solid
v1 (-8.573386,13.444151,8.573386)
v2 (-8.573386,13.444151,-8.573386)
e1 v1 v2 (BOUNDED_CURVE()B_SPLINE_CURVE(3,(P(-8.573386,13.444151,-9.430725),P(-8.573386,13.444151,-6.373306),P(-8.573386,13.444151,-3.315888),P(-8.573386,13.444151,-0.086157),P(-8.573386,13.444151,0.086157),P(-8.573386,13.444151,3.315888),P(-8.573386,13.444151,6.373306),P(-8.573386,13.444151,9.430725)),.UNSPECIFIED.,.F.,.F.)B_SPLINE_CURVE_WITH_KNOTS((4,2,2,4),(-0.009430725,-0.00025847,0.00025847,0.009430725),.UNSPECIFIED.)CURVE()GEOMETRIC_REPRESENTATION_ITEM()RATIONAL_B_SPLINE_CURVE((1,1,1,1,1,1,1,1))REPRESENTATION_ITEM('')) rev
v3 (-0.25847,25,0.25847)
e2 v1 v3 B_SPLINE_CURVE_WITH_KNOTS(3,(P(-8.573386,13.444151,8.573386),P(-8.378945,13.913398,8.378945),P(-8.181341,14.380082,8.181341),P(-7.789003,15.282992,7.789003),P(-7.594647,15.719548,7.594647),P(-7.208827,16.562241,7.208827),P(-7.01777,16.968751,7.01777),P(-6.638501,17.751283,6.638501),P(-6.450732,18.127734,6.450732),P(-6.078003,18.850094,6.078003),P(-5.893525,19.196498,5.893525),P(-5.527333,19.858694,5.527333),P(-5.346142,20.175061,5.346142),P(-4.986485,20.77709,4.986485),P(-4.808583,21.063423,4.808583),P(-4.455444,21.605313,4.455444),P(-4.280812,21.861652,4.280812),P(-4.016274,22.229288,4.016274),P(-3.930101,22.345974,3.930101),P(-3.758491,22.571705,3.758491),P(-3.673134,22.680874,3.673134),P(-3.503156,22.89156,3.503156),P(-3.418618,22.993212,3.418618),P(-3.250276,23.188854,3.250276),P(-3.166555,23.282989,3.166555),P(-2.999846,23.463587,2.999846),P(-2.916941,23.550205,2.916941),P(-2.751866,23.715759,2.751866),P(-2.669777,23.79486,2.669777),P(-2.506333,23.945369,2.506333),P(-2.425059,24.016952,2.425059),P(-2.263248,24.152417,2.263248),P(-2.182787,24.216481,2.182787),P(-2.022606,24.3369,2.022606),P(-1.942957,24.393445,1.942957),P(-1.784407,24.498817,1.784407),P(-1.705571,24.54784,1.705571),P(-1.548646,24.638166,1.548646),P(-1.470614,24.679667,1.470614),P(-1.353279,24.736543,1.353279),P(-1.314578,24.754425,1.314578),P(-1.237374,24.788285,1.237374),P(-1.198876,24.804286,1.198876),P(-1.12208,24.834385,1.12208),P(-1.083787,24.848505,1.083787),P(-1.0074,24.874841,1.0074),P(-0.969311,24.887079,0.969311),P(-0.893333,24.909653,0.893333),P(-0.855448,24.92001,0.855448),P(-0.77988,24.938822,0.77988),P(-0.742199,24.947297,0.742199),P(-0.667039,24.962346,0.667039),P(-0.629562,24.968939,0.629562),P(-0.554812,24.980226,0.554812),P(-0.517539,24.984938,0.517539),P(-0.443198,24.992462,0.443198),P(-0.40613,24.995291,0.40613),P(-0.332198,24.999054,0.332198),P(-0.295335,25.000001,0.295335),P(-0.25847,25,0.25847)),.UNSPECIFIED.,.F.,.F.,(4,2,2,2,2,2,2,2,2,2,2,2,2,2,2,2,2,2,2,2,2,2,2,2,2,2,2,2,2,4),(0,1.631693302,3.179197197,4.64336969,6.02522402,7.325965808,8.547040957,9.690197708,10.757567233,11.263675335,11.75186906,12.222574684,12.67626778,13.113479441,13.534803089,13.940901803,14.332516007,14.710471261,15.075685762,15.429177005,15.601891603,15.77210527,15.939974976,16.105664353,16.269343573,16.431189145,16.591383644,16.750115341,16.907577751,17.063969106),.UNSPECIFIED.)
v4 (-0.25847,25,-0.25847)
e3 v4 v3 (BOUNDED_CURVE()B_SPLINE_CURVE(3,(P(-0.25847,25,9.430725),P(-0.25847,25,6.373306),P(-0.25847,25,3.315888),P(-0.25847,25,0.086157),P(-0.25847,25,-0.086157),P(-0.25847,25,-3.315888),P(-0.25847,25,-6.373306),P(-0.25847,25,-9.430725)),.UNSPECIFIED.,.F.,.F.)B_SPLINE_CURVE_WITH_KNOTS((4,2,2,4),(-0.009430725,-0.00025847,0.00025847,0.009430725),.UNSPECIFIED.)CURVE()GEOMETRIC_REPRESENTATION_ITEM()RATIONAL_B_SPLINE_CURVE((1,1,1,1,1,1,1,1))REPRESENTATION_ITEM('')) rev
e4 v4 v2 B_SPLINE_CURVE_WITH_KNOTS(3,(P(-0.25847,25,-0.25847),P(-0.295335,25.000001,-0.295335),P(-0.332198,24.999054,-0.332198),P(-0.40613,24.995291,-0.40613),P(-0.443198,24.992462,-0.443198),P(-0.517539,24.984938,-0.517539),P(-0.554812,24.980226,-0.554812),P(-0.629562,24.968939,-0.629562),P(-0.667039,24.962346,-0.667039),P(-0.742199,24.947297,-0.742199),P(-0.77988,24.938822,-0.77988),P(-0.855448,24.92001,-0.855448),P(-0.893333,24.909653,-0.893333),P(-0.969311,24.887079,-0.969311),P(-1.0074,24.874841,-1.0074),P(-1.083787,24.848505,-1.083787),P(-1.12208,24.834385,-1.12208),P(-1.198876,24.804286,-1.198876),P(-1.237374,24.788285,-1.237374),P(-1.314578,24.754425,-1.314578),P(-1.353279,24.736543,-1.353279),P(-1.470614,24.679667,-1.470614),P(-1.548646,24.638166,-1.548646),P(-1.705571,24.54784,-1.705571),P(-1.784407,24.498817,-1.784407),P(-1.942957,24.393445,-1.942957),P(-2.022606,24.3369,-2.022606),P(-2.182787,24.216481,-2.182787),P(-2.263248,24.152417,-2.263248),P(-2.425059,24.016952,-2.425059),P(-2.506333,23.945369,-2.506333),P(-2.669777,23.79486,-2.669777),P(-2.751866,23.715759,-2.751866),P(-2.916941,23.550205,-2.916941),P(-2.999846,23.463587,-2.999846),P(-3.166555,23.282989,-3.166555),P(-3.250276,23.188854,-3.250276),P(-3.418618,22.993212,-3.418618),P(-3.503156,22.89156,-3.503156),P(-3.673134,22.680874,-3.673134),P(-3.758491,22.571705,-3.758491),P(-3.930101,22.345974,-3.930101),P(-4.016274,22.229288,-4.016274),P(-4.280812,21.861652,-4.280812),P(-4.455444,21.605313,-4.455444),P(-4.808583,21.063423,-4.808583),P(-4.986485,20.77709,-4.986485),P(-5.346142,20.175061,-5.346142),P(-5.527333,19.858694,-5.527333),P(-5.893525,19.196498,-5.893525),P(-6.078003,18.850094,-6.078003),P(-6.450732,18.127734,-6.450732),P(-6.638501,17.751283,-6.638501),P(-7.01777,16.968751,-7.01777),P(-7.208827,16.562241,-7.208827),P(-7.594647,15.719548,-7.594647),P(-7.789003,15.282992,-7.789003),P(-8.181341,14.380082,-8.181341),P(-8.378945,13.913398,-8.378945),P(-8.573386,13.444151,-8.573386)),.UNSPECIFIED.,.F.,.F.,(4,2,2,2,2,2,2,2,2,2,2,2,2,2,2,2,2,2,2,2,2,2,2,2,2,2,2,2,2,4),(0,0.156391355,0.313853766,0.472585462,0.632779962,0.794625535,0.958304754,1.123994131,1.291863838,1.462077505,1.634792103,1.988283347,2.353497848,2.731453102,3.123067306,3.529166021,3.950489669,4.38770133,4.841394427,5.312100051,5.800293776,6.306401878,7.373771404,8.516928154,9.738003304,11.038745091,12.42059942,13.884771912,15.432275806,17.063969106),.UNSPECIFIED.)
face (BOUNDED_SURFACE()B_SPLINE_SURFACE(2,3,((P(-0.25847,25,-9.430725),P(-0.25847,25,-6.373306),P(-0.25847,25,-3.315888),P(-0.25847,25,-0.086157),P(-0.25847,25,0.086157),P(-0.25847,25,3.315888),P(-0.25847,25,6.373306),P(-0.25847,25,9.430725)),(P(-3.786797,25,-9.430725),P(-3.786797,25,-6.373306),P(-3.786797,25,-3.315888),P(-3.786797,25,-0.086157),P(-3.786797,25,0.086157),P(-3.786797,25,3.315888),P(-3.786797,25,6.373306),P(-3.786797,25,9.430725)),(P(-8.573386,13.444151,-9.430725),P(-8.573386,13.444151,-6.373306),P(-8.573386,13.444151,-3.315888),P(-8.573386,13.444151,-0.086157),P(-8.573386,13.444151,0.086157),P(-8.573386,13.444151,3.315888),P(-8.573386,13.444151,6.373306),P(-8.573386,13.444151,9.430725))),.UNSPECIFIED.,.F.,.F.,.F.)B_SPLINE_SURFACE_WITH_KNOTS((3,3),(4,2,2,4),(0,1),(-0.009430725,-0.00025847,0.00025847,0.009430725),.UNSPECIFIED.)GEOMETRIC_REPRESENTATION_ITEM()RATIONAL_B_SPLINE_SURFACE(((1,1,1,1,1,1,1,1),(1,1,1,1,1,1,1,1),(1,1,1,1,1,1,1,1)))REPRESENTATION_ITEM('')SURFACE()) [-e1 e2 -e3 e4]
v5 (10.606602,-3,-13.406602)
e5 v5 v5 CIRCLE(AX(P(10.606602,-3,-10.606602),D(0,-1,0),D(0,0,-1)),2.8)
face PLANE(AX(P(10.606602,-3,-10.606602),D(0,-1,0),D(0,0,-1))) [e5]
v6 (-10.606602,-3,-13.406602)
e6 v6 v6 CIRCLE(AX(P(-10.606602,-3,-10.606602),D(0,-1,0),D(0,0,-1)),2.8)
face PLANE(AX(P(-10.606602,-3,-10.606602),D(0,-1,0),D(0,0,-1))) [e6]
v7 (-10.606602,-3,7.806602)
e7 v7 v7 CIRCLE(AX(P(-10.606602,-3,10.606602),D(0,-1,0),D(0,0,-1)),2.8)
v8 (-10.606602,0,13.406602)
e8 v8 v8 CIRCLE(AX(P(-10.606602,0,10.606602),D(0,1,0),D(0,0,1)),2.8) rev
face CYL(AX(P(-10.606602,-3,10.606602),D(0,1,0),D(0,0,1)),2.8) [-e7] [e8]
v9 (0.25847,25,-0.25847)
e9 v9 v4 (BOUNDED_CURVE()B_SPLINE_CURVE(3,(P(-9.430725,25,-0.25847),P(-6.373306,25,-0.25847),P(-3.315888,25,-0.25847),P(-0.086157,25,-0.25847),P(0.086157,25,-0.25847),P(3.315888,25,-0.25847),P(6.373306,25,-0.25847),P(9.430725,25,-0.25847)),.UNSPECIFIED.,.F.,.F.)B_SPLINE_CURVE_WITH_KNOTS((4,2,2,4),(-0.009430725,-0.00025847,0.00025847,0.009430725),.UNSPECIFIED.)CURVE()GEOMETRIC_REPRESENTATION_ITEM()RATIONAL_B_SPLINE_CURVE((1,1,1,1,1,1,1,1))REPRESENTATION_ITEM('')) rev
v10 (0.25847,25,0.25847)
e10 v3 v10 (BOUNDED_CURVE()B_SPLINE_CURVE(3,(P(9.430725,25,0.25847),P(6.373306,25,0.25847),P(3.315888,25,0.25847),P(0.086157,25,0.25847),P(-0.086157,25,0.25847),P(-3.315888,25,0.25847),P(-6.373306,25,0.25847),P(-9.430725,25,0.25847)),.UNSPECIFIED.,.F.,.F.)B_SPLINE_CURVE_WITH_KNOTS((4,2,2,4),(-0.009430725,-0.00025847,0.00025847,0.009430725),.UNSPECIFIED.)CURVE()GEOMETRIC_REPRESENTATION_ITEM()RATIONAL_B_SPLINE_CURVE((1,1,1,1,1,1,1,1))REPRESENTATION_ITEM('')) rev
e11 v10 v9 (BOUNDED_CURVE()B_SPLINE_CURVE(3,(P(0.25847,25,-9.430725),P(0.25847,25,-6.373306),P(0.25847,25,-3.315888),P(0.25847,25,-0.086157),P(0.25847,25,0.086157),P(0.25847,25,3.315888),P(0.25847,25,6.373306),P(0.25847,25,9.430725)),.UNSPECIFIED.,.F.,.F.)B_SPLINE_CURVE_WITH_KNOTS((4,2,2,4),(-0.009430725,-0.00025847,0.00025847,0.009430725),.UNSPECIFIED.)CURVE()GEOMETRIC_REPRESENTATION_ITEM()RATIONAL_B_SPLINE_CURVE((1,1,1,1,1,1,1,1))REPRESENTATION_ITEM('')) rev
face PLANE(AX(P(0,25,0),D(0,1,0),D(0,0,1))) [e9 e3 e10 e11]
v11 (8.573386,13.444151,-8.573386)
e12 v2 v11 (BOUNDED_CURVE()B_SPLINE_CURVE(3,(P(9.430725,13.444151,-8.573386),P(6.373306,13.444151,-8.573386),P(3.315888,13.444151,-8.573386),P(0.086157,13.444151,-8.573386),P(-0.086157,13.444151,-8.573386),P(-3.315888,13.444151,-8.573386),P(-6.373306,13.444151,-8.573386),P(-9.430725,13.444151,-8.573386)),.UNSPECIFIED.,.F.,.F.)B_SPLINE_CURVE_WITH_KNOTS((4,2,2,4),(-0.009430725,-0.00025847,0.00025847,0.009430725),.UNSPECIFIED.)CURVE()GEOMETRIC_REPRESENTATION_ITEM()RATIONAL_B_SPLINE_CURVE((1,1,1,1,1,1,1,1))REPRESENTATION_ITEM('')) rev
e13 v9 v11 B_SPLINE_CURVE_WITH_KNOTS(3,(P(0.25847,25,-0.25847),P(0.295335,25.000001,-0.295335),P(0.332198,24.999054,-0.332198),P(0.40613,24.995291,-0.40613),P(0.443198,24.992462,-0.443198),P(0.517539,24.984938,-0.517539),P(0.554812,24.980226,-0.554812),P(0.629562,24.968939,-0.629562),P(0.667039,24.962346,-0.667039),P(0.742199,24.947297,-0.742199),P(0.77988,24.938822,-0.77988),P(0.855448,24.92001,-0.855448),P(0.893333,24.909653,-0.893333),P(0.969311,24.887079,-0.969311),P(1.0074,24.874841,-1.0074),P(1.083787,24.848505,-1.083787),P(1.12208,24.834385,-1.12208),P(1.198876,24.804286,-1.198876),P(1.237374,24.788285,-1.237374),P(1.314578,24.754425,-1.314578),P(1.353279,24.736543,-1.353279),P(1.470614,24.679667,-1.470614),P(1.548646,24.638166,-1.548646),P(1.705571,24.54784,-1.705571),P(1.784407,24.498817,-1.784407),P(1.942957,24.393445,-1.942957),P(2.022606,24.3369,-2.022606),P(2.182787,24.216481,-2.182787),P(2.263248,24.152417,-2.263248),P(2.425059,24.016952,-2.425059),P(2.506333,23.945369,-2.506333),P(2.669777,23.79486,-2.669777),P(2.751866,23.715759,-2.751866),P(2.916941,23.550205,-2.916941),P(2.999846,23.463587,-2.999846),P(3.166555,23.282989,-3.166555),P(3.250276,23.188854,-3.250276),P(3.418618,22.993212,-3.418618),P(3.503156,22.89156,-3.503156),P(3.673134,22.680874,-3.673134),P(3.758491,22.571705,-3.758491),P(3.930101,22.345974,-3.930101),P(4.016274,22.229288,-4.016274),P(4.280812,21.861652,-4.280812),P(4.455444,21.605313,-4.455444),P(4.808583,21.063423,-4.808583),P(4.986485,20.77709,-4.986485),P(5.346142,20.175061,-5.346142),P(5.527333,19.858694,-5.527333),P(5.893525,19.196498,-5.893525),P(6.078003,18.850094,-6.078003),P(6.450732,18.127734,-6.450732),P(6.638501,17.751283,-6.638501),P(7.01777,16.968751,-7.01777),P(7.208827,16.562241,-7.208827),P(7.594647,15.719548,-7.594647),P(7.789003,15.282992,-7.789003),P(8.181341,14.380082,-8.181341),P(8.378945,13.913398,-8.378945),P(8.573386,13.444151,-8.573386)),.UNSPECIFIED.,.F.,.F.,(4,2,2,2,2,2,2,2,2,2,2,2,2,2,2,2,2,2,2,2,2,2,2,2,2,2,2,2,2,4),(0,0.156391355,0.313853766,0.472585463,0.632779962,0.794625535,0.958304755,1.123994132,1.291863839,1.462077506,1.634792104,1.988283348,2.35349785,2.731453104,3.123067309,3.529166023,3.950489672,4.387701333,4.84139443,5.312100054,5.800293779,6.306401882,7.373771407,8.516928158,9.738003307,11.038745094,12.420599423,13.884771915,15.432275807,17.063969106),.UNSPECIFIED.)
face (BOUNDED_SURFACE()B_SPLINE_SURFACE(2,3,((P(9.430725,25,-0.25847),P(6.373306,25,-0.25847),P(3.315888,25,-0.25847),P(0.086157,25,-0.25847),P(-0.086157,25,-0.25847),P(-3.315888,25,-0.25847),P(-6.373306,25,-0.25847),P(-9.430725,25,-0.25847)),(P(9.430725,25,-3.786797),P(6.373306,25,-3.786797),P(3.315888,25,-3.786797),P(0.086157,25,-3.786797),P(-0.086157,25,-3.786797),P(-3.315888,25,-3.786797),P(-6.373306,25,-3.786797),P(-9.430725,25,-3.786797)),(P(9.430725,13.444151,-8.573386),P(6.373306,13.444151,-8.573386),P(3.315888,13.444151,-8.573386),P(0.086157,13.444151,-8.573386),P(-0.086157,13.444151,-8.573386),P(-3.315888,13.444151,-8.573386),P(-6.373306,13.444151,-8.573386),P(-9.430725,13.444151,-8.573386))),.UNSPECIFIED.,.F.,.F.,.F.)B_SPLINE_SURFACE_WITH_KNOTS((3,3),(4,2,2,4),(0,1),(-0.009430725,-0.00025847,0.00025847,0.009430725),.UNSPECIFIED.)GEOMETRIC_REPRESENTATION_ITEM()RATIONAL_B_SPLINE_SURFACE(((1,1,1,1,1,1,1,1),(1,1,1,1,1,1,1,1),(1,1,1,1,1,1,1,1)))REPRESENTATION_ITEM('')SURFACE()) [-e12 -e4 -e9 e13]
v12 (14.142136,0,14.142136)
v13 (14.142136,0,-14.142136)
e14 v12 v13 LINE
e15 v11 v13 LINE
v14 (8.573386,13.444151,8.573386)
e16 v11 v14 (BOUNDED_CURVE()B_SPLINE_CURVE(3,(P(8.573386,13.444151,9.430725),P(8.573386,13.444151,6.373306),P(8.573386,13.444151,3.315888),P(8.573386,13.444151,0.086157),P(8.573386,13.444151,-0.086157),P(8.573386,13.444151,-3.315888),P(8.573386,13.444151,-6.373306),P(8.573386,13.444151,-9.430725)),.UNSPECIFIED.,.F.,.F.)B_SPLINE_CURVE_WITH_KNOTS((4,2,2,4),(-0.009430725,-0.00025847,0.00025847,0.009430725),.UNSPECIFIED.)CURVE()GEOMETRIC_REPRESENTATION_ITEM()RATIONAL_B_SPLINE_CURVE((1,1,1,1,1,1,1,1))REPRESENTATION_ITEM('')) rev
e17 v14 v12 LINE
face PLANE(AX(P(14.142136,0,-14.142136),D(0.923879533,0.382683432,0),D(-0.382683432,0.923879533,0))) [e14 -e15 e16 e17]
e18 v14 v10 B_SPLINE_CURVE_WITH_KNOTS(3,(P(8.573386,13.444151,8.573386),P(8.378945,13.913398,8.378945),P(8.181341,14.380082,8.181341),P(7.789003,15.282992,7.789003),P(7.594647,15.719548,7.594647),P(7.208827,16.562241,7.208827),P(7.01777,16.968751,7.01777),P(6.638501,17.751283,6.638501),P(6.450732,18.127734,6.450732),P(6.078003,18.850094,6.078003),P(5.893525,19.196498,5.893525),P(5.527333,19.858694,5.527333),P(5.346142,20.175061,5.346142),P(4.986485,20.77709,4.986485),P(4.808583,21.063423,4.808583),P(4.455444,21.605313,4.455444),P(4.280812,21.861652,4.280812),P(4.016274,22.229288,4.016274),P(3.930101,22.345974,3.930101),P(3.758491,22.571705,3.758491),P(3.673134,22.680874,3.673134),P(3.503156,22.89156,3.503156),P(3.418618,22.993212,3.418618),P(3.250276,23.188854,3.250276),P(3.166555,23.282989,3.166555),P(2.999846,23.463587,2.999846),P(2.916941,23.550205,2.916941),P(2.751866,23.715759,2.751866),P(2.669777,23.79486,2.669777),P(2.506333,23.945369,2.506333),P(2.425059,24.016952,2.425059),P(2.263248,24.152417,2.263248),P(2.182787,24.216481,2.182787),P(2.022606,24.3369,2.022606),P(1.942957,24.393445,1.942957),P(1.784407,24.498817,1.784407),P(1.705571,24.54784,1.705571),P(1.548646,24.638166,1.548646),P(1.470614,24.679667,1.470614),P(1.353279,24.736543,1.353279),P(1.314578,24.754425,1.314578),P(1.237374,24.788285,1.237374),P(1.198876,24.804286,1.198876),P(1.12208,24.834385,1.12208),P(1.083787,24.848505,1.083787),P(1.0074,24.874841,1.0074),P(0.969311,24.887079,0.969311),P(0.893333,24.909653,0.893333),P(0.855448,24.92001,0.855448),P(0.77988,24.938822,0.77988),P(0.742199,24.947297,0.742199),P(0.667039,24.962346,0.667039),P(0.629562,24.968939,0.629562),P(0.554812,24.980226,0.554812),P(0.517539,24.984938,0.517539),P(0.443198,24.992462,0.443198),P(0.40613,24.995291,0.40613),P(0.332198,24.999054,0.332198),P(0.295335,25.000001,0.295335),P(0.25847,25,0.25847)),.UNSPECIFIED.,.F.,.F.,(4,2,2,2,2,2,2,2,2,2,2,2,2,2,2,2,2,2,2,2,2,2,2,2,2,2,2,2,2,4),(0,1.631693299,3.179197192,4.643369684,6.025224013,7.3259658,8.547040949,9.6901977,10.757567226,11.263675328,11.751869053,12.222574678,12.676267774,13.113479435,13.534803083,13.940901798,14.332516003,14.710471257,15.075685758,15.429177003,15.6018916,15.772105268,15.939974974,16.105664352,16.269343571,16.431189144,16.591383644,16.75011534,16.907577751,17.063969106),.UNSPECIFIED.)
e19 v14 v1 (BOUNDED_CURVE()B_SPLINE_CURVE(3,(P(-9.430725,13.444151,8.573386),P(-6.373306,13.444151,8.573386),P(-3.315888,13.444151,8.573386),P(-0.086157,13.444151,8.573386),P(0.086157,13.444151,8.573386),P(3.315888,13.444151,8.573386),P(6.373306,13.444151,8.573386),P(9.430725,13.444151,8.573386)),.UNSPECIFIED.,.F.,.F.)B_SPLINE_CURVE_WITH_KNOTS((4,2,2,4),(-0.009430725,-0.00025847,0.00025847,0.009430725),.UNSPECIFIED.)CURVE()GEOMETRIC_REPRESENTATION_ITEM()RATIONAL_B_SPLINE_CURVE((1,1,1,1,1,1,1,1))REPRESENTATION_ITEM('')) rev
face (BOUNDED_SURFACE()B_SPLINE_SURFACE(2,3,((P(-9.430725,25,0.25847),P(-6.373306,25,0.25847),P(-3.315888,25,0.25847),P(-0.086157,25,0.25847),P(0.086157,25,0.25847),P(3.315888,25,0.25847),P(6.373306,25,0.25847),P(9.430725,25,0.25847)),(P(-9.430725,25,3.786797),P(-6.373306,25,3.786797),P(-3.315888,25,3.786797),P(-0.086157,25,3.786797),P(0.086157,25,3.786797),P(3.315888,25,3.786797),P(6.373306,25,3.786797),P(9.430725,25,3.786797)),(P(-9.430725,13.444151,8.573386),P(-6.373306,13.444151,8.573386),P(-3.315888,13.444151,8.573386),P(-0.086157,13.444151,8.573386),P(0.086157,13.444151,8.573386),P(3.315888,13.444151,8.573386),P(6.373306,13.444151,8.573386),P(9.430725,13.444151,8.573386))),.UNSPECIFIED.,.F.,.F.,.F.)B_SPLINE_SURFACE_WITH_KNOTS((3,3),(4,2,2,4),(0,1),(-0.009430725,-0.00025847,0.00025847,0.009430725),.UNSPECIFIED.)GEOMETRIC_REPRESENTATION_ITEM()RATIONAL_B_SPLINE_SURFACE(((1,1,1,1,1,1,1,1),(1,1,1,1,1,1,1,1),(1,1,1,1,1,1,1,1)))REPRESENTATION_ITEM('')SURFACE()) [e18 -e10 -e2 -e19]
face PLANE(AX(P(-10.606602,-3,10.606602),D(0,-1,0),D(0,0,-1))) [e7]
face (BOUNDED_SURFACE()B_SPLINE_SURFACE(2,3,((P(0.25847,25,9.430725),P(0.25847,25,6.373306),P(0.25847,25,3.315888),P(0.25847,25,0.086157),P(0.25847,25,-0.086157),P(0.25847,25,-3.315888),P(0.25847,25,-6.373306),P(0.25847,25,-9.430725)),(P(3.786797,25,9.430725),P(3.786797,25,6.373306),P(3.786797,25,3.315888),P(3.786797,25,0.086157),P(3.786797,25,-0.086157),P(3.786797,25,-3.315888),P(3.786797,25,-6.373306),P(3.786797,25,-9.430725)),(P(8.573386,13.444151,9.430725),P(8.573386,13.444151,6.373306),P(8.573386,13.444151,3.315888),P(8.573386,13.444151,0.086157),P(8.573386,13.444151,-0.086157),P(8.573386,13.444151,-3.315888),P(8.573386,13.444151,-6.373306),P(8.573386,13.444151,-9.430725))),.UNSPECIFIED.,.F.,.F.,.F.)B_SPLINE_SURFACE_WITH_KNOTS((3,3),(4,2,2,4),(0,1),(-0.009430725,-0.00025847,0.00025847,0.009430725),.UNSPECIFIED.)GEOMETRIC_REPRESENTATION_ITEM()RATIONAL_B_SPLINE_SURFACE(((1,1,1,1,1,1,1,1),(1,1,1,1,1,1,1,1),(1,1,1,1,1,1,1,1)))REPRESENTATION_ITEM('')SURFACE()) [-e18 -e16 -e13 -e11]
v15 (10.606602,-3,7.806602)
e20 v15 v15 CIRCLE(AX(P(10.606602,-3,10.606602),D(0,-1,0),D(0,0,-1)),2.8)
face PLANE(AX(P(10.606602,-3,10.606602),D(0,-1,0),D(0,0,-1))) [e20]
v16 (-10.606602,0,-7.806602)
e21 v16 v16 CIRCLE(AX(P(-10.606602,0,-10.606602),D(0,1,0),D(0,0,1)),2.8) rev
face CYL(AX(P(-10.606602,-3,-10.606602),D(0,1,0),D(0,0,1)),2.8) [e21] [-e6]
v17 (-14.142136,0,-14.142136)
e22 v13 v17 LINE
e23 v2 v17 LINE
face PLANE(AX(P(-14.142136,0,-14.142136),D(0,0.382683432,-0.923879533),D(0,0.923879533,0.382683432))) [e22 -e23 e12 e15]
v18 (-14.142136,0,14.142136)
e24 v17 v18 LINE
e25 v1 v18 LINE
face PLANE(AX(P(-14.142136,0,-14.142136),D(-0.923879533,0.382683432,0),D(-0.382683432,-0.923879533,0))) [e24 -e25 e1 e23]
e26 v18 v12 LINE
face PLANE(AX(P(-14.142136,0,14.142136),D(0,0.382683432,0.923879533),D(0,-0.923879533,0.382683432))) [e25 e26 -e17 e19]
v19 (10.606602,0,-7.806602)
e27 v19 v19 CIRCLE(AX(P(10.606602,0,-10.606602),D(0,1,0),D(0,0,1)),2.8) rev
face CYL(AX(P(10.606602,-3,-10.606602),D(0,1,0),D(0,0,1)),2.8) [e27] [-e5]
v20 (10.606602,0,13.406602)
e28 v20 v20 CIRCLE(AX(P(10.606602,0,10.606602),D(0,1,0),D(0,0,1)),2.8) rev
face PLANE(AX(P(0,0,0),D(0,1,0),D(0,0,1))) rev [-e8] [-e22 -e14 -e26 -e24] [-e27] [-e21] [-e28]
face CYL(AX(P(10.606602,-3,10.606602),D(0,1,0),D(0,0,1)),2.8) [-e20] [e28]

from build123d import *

# Parameters (mm, degrees)
ESQUISSE6_W        = 28.284271248
ESQUISSE6_H        = 28.284271248
BOSS_EXTRU_2_DEPTH = 25
BOSS_EXTRU_2_TAPER = 22.5
ESQUISSE7_R        = 2.8
BOSS_EXTRU_3_DEPTH = 3


with BuildPart() as part:
    # Esquisse6 → Boss.-Extru.2 (new body)
    with BuildSketch(Plane(origin=(0, 0, 0), x_dir=(1, 0, 0), z_dir=(0, 1, 0))):
        Rectangle(ESQUISSE6_W, ESQUISSE6_H)
    extrude(amount=BOSS_EXTRU_2_DEPTH, taper=BOSS_EXTRU_2_TAPER)

    # Congé3
    # a fillet whose section is not a circle: 15, 9 mm, written as the material it takes off along each edge
    with BuildSketch(Plane(origin=(-35.056698922, 25, 3.786796564), x_dir=(0, -0.9238795325112864, 0.38268343236509067), z_dir=(1, 0, 0)), Plane(origin=(-3.786796564, 25, -35.056698922), x_dir=(-0.3826834323650906, -0.9238795325112864, 0), z_dir=(0, 0, 1)), Plane(origin=(35.056698922, 25, -3.786796564), x_dir=(0, -0.9238795325112864, -0.38268343236509056), z_dir=(-1, 0, 0)), Plane(origin=(3.786796564, 25, 35.056698922), x_dir=(0.3826834323650906, -0.9238795325112864, 0), z_dir=(0, 0, -1))) as cong_3_piece_1:
        with BuildLine():
            Bezier((12.507960943, 0), (0, 0), (-1.350232045, 3.259748515), weights=[1, 1, 1])
            Line((-1.350232045, 3.259748515), (0, 0))
            Line((0, 0), (12.507960943, 0))
        make_face()
    extrude(amount=70.113397844, mode=Mode.SUBTRACT)

    # Esquisse7 → Boss.-Extru.3 (add)
    with BuildSketch(Plane.XZ):
        with Locations(Location((-10.606601718, 10.606601718, 0), (0, 0, 90))):
            Circle(ESQUISSE7_R)
        with Locations(Location((10.606601718, 10.606601718, 0), (0, 0, 90))):
            Circle(ESQUISSE7_R)
        with Locations(Location((10.606601718, -10.606601718, 0), (0, 0, 90))):
            Circle(ESQUISSE7_R)
        with Locations(Location((-10.606601718, -10.606601718, 0), (0, 0, 90))):
            Circle(ESQUISSE7_R)
    extrude(amount=BOSS_EXTRU_3_DEPTH)


solid = part.part
